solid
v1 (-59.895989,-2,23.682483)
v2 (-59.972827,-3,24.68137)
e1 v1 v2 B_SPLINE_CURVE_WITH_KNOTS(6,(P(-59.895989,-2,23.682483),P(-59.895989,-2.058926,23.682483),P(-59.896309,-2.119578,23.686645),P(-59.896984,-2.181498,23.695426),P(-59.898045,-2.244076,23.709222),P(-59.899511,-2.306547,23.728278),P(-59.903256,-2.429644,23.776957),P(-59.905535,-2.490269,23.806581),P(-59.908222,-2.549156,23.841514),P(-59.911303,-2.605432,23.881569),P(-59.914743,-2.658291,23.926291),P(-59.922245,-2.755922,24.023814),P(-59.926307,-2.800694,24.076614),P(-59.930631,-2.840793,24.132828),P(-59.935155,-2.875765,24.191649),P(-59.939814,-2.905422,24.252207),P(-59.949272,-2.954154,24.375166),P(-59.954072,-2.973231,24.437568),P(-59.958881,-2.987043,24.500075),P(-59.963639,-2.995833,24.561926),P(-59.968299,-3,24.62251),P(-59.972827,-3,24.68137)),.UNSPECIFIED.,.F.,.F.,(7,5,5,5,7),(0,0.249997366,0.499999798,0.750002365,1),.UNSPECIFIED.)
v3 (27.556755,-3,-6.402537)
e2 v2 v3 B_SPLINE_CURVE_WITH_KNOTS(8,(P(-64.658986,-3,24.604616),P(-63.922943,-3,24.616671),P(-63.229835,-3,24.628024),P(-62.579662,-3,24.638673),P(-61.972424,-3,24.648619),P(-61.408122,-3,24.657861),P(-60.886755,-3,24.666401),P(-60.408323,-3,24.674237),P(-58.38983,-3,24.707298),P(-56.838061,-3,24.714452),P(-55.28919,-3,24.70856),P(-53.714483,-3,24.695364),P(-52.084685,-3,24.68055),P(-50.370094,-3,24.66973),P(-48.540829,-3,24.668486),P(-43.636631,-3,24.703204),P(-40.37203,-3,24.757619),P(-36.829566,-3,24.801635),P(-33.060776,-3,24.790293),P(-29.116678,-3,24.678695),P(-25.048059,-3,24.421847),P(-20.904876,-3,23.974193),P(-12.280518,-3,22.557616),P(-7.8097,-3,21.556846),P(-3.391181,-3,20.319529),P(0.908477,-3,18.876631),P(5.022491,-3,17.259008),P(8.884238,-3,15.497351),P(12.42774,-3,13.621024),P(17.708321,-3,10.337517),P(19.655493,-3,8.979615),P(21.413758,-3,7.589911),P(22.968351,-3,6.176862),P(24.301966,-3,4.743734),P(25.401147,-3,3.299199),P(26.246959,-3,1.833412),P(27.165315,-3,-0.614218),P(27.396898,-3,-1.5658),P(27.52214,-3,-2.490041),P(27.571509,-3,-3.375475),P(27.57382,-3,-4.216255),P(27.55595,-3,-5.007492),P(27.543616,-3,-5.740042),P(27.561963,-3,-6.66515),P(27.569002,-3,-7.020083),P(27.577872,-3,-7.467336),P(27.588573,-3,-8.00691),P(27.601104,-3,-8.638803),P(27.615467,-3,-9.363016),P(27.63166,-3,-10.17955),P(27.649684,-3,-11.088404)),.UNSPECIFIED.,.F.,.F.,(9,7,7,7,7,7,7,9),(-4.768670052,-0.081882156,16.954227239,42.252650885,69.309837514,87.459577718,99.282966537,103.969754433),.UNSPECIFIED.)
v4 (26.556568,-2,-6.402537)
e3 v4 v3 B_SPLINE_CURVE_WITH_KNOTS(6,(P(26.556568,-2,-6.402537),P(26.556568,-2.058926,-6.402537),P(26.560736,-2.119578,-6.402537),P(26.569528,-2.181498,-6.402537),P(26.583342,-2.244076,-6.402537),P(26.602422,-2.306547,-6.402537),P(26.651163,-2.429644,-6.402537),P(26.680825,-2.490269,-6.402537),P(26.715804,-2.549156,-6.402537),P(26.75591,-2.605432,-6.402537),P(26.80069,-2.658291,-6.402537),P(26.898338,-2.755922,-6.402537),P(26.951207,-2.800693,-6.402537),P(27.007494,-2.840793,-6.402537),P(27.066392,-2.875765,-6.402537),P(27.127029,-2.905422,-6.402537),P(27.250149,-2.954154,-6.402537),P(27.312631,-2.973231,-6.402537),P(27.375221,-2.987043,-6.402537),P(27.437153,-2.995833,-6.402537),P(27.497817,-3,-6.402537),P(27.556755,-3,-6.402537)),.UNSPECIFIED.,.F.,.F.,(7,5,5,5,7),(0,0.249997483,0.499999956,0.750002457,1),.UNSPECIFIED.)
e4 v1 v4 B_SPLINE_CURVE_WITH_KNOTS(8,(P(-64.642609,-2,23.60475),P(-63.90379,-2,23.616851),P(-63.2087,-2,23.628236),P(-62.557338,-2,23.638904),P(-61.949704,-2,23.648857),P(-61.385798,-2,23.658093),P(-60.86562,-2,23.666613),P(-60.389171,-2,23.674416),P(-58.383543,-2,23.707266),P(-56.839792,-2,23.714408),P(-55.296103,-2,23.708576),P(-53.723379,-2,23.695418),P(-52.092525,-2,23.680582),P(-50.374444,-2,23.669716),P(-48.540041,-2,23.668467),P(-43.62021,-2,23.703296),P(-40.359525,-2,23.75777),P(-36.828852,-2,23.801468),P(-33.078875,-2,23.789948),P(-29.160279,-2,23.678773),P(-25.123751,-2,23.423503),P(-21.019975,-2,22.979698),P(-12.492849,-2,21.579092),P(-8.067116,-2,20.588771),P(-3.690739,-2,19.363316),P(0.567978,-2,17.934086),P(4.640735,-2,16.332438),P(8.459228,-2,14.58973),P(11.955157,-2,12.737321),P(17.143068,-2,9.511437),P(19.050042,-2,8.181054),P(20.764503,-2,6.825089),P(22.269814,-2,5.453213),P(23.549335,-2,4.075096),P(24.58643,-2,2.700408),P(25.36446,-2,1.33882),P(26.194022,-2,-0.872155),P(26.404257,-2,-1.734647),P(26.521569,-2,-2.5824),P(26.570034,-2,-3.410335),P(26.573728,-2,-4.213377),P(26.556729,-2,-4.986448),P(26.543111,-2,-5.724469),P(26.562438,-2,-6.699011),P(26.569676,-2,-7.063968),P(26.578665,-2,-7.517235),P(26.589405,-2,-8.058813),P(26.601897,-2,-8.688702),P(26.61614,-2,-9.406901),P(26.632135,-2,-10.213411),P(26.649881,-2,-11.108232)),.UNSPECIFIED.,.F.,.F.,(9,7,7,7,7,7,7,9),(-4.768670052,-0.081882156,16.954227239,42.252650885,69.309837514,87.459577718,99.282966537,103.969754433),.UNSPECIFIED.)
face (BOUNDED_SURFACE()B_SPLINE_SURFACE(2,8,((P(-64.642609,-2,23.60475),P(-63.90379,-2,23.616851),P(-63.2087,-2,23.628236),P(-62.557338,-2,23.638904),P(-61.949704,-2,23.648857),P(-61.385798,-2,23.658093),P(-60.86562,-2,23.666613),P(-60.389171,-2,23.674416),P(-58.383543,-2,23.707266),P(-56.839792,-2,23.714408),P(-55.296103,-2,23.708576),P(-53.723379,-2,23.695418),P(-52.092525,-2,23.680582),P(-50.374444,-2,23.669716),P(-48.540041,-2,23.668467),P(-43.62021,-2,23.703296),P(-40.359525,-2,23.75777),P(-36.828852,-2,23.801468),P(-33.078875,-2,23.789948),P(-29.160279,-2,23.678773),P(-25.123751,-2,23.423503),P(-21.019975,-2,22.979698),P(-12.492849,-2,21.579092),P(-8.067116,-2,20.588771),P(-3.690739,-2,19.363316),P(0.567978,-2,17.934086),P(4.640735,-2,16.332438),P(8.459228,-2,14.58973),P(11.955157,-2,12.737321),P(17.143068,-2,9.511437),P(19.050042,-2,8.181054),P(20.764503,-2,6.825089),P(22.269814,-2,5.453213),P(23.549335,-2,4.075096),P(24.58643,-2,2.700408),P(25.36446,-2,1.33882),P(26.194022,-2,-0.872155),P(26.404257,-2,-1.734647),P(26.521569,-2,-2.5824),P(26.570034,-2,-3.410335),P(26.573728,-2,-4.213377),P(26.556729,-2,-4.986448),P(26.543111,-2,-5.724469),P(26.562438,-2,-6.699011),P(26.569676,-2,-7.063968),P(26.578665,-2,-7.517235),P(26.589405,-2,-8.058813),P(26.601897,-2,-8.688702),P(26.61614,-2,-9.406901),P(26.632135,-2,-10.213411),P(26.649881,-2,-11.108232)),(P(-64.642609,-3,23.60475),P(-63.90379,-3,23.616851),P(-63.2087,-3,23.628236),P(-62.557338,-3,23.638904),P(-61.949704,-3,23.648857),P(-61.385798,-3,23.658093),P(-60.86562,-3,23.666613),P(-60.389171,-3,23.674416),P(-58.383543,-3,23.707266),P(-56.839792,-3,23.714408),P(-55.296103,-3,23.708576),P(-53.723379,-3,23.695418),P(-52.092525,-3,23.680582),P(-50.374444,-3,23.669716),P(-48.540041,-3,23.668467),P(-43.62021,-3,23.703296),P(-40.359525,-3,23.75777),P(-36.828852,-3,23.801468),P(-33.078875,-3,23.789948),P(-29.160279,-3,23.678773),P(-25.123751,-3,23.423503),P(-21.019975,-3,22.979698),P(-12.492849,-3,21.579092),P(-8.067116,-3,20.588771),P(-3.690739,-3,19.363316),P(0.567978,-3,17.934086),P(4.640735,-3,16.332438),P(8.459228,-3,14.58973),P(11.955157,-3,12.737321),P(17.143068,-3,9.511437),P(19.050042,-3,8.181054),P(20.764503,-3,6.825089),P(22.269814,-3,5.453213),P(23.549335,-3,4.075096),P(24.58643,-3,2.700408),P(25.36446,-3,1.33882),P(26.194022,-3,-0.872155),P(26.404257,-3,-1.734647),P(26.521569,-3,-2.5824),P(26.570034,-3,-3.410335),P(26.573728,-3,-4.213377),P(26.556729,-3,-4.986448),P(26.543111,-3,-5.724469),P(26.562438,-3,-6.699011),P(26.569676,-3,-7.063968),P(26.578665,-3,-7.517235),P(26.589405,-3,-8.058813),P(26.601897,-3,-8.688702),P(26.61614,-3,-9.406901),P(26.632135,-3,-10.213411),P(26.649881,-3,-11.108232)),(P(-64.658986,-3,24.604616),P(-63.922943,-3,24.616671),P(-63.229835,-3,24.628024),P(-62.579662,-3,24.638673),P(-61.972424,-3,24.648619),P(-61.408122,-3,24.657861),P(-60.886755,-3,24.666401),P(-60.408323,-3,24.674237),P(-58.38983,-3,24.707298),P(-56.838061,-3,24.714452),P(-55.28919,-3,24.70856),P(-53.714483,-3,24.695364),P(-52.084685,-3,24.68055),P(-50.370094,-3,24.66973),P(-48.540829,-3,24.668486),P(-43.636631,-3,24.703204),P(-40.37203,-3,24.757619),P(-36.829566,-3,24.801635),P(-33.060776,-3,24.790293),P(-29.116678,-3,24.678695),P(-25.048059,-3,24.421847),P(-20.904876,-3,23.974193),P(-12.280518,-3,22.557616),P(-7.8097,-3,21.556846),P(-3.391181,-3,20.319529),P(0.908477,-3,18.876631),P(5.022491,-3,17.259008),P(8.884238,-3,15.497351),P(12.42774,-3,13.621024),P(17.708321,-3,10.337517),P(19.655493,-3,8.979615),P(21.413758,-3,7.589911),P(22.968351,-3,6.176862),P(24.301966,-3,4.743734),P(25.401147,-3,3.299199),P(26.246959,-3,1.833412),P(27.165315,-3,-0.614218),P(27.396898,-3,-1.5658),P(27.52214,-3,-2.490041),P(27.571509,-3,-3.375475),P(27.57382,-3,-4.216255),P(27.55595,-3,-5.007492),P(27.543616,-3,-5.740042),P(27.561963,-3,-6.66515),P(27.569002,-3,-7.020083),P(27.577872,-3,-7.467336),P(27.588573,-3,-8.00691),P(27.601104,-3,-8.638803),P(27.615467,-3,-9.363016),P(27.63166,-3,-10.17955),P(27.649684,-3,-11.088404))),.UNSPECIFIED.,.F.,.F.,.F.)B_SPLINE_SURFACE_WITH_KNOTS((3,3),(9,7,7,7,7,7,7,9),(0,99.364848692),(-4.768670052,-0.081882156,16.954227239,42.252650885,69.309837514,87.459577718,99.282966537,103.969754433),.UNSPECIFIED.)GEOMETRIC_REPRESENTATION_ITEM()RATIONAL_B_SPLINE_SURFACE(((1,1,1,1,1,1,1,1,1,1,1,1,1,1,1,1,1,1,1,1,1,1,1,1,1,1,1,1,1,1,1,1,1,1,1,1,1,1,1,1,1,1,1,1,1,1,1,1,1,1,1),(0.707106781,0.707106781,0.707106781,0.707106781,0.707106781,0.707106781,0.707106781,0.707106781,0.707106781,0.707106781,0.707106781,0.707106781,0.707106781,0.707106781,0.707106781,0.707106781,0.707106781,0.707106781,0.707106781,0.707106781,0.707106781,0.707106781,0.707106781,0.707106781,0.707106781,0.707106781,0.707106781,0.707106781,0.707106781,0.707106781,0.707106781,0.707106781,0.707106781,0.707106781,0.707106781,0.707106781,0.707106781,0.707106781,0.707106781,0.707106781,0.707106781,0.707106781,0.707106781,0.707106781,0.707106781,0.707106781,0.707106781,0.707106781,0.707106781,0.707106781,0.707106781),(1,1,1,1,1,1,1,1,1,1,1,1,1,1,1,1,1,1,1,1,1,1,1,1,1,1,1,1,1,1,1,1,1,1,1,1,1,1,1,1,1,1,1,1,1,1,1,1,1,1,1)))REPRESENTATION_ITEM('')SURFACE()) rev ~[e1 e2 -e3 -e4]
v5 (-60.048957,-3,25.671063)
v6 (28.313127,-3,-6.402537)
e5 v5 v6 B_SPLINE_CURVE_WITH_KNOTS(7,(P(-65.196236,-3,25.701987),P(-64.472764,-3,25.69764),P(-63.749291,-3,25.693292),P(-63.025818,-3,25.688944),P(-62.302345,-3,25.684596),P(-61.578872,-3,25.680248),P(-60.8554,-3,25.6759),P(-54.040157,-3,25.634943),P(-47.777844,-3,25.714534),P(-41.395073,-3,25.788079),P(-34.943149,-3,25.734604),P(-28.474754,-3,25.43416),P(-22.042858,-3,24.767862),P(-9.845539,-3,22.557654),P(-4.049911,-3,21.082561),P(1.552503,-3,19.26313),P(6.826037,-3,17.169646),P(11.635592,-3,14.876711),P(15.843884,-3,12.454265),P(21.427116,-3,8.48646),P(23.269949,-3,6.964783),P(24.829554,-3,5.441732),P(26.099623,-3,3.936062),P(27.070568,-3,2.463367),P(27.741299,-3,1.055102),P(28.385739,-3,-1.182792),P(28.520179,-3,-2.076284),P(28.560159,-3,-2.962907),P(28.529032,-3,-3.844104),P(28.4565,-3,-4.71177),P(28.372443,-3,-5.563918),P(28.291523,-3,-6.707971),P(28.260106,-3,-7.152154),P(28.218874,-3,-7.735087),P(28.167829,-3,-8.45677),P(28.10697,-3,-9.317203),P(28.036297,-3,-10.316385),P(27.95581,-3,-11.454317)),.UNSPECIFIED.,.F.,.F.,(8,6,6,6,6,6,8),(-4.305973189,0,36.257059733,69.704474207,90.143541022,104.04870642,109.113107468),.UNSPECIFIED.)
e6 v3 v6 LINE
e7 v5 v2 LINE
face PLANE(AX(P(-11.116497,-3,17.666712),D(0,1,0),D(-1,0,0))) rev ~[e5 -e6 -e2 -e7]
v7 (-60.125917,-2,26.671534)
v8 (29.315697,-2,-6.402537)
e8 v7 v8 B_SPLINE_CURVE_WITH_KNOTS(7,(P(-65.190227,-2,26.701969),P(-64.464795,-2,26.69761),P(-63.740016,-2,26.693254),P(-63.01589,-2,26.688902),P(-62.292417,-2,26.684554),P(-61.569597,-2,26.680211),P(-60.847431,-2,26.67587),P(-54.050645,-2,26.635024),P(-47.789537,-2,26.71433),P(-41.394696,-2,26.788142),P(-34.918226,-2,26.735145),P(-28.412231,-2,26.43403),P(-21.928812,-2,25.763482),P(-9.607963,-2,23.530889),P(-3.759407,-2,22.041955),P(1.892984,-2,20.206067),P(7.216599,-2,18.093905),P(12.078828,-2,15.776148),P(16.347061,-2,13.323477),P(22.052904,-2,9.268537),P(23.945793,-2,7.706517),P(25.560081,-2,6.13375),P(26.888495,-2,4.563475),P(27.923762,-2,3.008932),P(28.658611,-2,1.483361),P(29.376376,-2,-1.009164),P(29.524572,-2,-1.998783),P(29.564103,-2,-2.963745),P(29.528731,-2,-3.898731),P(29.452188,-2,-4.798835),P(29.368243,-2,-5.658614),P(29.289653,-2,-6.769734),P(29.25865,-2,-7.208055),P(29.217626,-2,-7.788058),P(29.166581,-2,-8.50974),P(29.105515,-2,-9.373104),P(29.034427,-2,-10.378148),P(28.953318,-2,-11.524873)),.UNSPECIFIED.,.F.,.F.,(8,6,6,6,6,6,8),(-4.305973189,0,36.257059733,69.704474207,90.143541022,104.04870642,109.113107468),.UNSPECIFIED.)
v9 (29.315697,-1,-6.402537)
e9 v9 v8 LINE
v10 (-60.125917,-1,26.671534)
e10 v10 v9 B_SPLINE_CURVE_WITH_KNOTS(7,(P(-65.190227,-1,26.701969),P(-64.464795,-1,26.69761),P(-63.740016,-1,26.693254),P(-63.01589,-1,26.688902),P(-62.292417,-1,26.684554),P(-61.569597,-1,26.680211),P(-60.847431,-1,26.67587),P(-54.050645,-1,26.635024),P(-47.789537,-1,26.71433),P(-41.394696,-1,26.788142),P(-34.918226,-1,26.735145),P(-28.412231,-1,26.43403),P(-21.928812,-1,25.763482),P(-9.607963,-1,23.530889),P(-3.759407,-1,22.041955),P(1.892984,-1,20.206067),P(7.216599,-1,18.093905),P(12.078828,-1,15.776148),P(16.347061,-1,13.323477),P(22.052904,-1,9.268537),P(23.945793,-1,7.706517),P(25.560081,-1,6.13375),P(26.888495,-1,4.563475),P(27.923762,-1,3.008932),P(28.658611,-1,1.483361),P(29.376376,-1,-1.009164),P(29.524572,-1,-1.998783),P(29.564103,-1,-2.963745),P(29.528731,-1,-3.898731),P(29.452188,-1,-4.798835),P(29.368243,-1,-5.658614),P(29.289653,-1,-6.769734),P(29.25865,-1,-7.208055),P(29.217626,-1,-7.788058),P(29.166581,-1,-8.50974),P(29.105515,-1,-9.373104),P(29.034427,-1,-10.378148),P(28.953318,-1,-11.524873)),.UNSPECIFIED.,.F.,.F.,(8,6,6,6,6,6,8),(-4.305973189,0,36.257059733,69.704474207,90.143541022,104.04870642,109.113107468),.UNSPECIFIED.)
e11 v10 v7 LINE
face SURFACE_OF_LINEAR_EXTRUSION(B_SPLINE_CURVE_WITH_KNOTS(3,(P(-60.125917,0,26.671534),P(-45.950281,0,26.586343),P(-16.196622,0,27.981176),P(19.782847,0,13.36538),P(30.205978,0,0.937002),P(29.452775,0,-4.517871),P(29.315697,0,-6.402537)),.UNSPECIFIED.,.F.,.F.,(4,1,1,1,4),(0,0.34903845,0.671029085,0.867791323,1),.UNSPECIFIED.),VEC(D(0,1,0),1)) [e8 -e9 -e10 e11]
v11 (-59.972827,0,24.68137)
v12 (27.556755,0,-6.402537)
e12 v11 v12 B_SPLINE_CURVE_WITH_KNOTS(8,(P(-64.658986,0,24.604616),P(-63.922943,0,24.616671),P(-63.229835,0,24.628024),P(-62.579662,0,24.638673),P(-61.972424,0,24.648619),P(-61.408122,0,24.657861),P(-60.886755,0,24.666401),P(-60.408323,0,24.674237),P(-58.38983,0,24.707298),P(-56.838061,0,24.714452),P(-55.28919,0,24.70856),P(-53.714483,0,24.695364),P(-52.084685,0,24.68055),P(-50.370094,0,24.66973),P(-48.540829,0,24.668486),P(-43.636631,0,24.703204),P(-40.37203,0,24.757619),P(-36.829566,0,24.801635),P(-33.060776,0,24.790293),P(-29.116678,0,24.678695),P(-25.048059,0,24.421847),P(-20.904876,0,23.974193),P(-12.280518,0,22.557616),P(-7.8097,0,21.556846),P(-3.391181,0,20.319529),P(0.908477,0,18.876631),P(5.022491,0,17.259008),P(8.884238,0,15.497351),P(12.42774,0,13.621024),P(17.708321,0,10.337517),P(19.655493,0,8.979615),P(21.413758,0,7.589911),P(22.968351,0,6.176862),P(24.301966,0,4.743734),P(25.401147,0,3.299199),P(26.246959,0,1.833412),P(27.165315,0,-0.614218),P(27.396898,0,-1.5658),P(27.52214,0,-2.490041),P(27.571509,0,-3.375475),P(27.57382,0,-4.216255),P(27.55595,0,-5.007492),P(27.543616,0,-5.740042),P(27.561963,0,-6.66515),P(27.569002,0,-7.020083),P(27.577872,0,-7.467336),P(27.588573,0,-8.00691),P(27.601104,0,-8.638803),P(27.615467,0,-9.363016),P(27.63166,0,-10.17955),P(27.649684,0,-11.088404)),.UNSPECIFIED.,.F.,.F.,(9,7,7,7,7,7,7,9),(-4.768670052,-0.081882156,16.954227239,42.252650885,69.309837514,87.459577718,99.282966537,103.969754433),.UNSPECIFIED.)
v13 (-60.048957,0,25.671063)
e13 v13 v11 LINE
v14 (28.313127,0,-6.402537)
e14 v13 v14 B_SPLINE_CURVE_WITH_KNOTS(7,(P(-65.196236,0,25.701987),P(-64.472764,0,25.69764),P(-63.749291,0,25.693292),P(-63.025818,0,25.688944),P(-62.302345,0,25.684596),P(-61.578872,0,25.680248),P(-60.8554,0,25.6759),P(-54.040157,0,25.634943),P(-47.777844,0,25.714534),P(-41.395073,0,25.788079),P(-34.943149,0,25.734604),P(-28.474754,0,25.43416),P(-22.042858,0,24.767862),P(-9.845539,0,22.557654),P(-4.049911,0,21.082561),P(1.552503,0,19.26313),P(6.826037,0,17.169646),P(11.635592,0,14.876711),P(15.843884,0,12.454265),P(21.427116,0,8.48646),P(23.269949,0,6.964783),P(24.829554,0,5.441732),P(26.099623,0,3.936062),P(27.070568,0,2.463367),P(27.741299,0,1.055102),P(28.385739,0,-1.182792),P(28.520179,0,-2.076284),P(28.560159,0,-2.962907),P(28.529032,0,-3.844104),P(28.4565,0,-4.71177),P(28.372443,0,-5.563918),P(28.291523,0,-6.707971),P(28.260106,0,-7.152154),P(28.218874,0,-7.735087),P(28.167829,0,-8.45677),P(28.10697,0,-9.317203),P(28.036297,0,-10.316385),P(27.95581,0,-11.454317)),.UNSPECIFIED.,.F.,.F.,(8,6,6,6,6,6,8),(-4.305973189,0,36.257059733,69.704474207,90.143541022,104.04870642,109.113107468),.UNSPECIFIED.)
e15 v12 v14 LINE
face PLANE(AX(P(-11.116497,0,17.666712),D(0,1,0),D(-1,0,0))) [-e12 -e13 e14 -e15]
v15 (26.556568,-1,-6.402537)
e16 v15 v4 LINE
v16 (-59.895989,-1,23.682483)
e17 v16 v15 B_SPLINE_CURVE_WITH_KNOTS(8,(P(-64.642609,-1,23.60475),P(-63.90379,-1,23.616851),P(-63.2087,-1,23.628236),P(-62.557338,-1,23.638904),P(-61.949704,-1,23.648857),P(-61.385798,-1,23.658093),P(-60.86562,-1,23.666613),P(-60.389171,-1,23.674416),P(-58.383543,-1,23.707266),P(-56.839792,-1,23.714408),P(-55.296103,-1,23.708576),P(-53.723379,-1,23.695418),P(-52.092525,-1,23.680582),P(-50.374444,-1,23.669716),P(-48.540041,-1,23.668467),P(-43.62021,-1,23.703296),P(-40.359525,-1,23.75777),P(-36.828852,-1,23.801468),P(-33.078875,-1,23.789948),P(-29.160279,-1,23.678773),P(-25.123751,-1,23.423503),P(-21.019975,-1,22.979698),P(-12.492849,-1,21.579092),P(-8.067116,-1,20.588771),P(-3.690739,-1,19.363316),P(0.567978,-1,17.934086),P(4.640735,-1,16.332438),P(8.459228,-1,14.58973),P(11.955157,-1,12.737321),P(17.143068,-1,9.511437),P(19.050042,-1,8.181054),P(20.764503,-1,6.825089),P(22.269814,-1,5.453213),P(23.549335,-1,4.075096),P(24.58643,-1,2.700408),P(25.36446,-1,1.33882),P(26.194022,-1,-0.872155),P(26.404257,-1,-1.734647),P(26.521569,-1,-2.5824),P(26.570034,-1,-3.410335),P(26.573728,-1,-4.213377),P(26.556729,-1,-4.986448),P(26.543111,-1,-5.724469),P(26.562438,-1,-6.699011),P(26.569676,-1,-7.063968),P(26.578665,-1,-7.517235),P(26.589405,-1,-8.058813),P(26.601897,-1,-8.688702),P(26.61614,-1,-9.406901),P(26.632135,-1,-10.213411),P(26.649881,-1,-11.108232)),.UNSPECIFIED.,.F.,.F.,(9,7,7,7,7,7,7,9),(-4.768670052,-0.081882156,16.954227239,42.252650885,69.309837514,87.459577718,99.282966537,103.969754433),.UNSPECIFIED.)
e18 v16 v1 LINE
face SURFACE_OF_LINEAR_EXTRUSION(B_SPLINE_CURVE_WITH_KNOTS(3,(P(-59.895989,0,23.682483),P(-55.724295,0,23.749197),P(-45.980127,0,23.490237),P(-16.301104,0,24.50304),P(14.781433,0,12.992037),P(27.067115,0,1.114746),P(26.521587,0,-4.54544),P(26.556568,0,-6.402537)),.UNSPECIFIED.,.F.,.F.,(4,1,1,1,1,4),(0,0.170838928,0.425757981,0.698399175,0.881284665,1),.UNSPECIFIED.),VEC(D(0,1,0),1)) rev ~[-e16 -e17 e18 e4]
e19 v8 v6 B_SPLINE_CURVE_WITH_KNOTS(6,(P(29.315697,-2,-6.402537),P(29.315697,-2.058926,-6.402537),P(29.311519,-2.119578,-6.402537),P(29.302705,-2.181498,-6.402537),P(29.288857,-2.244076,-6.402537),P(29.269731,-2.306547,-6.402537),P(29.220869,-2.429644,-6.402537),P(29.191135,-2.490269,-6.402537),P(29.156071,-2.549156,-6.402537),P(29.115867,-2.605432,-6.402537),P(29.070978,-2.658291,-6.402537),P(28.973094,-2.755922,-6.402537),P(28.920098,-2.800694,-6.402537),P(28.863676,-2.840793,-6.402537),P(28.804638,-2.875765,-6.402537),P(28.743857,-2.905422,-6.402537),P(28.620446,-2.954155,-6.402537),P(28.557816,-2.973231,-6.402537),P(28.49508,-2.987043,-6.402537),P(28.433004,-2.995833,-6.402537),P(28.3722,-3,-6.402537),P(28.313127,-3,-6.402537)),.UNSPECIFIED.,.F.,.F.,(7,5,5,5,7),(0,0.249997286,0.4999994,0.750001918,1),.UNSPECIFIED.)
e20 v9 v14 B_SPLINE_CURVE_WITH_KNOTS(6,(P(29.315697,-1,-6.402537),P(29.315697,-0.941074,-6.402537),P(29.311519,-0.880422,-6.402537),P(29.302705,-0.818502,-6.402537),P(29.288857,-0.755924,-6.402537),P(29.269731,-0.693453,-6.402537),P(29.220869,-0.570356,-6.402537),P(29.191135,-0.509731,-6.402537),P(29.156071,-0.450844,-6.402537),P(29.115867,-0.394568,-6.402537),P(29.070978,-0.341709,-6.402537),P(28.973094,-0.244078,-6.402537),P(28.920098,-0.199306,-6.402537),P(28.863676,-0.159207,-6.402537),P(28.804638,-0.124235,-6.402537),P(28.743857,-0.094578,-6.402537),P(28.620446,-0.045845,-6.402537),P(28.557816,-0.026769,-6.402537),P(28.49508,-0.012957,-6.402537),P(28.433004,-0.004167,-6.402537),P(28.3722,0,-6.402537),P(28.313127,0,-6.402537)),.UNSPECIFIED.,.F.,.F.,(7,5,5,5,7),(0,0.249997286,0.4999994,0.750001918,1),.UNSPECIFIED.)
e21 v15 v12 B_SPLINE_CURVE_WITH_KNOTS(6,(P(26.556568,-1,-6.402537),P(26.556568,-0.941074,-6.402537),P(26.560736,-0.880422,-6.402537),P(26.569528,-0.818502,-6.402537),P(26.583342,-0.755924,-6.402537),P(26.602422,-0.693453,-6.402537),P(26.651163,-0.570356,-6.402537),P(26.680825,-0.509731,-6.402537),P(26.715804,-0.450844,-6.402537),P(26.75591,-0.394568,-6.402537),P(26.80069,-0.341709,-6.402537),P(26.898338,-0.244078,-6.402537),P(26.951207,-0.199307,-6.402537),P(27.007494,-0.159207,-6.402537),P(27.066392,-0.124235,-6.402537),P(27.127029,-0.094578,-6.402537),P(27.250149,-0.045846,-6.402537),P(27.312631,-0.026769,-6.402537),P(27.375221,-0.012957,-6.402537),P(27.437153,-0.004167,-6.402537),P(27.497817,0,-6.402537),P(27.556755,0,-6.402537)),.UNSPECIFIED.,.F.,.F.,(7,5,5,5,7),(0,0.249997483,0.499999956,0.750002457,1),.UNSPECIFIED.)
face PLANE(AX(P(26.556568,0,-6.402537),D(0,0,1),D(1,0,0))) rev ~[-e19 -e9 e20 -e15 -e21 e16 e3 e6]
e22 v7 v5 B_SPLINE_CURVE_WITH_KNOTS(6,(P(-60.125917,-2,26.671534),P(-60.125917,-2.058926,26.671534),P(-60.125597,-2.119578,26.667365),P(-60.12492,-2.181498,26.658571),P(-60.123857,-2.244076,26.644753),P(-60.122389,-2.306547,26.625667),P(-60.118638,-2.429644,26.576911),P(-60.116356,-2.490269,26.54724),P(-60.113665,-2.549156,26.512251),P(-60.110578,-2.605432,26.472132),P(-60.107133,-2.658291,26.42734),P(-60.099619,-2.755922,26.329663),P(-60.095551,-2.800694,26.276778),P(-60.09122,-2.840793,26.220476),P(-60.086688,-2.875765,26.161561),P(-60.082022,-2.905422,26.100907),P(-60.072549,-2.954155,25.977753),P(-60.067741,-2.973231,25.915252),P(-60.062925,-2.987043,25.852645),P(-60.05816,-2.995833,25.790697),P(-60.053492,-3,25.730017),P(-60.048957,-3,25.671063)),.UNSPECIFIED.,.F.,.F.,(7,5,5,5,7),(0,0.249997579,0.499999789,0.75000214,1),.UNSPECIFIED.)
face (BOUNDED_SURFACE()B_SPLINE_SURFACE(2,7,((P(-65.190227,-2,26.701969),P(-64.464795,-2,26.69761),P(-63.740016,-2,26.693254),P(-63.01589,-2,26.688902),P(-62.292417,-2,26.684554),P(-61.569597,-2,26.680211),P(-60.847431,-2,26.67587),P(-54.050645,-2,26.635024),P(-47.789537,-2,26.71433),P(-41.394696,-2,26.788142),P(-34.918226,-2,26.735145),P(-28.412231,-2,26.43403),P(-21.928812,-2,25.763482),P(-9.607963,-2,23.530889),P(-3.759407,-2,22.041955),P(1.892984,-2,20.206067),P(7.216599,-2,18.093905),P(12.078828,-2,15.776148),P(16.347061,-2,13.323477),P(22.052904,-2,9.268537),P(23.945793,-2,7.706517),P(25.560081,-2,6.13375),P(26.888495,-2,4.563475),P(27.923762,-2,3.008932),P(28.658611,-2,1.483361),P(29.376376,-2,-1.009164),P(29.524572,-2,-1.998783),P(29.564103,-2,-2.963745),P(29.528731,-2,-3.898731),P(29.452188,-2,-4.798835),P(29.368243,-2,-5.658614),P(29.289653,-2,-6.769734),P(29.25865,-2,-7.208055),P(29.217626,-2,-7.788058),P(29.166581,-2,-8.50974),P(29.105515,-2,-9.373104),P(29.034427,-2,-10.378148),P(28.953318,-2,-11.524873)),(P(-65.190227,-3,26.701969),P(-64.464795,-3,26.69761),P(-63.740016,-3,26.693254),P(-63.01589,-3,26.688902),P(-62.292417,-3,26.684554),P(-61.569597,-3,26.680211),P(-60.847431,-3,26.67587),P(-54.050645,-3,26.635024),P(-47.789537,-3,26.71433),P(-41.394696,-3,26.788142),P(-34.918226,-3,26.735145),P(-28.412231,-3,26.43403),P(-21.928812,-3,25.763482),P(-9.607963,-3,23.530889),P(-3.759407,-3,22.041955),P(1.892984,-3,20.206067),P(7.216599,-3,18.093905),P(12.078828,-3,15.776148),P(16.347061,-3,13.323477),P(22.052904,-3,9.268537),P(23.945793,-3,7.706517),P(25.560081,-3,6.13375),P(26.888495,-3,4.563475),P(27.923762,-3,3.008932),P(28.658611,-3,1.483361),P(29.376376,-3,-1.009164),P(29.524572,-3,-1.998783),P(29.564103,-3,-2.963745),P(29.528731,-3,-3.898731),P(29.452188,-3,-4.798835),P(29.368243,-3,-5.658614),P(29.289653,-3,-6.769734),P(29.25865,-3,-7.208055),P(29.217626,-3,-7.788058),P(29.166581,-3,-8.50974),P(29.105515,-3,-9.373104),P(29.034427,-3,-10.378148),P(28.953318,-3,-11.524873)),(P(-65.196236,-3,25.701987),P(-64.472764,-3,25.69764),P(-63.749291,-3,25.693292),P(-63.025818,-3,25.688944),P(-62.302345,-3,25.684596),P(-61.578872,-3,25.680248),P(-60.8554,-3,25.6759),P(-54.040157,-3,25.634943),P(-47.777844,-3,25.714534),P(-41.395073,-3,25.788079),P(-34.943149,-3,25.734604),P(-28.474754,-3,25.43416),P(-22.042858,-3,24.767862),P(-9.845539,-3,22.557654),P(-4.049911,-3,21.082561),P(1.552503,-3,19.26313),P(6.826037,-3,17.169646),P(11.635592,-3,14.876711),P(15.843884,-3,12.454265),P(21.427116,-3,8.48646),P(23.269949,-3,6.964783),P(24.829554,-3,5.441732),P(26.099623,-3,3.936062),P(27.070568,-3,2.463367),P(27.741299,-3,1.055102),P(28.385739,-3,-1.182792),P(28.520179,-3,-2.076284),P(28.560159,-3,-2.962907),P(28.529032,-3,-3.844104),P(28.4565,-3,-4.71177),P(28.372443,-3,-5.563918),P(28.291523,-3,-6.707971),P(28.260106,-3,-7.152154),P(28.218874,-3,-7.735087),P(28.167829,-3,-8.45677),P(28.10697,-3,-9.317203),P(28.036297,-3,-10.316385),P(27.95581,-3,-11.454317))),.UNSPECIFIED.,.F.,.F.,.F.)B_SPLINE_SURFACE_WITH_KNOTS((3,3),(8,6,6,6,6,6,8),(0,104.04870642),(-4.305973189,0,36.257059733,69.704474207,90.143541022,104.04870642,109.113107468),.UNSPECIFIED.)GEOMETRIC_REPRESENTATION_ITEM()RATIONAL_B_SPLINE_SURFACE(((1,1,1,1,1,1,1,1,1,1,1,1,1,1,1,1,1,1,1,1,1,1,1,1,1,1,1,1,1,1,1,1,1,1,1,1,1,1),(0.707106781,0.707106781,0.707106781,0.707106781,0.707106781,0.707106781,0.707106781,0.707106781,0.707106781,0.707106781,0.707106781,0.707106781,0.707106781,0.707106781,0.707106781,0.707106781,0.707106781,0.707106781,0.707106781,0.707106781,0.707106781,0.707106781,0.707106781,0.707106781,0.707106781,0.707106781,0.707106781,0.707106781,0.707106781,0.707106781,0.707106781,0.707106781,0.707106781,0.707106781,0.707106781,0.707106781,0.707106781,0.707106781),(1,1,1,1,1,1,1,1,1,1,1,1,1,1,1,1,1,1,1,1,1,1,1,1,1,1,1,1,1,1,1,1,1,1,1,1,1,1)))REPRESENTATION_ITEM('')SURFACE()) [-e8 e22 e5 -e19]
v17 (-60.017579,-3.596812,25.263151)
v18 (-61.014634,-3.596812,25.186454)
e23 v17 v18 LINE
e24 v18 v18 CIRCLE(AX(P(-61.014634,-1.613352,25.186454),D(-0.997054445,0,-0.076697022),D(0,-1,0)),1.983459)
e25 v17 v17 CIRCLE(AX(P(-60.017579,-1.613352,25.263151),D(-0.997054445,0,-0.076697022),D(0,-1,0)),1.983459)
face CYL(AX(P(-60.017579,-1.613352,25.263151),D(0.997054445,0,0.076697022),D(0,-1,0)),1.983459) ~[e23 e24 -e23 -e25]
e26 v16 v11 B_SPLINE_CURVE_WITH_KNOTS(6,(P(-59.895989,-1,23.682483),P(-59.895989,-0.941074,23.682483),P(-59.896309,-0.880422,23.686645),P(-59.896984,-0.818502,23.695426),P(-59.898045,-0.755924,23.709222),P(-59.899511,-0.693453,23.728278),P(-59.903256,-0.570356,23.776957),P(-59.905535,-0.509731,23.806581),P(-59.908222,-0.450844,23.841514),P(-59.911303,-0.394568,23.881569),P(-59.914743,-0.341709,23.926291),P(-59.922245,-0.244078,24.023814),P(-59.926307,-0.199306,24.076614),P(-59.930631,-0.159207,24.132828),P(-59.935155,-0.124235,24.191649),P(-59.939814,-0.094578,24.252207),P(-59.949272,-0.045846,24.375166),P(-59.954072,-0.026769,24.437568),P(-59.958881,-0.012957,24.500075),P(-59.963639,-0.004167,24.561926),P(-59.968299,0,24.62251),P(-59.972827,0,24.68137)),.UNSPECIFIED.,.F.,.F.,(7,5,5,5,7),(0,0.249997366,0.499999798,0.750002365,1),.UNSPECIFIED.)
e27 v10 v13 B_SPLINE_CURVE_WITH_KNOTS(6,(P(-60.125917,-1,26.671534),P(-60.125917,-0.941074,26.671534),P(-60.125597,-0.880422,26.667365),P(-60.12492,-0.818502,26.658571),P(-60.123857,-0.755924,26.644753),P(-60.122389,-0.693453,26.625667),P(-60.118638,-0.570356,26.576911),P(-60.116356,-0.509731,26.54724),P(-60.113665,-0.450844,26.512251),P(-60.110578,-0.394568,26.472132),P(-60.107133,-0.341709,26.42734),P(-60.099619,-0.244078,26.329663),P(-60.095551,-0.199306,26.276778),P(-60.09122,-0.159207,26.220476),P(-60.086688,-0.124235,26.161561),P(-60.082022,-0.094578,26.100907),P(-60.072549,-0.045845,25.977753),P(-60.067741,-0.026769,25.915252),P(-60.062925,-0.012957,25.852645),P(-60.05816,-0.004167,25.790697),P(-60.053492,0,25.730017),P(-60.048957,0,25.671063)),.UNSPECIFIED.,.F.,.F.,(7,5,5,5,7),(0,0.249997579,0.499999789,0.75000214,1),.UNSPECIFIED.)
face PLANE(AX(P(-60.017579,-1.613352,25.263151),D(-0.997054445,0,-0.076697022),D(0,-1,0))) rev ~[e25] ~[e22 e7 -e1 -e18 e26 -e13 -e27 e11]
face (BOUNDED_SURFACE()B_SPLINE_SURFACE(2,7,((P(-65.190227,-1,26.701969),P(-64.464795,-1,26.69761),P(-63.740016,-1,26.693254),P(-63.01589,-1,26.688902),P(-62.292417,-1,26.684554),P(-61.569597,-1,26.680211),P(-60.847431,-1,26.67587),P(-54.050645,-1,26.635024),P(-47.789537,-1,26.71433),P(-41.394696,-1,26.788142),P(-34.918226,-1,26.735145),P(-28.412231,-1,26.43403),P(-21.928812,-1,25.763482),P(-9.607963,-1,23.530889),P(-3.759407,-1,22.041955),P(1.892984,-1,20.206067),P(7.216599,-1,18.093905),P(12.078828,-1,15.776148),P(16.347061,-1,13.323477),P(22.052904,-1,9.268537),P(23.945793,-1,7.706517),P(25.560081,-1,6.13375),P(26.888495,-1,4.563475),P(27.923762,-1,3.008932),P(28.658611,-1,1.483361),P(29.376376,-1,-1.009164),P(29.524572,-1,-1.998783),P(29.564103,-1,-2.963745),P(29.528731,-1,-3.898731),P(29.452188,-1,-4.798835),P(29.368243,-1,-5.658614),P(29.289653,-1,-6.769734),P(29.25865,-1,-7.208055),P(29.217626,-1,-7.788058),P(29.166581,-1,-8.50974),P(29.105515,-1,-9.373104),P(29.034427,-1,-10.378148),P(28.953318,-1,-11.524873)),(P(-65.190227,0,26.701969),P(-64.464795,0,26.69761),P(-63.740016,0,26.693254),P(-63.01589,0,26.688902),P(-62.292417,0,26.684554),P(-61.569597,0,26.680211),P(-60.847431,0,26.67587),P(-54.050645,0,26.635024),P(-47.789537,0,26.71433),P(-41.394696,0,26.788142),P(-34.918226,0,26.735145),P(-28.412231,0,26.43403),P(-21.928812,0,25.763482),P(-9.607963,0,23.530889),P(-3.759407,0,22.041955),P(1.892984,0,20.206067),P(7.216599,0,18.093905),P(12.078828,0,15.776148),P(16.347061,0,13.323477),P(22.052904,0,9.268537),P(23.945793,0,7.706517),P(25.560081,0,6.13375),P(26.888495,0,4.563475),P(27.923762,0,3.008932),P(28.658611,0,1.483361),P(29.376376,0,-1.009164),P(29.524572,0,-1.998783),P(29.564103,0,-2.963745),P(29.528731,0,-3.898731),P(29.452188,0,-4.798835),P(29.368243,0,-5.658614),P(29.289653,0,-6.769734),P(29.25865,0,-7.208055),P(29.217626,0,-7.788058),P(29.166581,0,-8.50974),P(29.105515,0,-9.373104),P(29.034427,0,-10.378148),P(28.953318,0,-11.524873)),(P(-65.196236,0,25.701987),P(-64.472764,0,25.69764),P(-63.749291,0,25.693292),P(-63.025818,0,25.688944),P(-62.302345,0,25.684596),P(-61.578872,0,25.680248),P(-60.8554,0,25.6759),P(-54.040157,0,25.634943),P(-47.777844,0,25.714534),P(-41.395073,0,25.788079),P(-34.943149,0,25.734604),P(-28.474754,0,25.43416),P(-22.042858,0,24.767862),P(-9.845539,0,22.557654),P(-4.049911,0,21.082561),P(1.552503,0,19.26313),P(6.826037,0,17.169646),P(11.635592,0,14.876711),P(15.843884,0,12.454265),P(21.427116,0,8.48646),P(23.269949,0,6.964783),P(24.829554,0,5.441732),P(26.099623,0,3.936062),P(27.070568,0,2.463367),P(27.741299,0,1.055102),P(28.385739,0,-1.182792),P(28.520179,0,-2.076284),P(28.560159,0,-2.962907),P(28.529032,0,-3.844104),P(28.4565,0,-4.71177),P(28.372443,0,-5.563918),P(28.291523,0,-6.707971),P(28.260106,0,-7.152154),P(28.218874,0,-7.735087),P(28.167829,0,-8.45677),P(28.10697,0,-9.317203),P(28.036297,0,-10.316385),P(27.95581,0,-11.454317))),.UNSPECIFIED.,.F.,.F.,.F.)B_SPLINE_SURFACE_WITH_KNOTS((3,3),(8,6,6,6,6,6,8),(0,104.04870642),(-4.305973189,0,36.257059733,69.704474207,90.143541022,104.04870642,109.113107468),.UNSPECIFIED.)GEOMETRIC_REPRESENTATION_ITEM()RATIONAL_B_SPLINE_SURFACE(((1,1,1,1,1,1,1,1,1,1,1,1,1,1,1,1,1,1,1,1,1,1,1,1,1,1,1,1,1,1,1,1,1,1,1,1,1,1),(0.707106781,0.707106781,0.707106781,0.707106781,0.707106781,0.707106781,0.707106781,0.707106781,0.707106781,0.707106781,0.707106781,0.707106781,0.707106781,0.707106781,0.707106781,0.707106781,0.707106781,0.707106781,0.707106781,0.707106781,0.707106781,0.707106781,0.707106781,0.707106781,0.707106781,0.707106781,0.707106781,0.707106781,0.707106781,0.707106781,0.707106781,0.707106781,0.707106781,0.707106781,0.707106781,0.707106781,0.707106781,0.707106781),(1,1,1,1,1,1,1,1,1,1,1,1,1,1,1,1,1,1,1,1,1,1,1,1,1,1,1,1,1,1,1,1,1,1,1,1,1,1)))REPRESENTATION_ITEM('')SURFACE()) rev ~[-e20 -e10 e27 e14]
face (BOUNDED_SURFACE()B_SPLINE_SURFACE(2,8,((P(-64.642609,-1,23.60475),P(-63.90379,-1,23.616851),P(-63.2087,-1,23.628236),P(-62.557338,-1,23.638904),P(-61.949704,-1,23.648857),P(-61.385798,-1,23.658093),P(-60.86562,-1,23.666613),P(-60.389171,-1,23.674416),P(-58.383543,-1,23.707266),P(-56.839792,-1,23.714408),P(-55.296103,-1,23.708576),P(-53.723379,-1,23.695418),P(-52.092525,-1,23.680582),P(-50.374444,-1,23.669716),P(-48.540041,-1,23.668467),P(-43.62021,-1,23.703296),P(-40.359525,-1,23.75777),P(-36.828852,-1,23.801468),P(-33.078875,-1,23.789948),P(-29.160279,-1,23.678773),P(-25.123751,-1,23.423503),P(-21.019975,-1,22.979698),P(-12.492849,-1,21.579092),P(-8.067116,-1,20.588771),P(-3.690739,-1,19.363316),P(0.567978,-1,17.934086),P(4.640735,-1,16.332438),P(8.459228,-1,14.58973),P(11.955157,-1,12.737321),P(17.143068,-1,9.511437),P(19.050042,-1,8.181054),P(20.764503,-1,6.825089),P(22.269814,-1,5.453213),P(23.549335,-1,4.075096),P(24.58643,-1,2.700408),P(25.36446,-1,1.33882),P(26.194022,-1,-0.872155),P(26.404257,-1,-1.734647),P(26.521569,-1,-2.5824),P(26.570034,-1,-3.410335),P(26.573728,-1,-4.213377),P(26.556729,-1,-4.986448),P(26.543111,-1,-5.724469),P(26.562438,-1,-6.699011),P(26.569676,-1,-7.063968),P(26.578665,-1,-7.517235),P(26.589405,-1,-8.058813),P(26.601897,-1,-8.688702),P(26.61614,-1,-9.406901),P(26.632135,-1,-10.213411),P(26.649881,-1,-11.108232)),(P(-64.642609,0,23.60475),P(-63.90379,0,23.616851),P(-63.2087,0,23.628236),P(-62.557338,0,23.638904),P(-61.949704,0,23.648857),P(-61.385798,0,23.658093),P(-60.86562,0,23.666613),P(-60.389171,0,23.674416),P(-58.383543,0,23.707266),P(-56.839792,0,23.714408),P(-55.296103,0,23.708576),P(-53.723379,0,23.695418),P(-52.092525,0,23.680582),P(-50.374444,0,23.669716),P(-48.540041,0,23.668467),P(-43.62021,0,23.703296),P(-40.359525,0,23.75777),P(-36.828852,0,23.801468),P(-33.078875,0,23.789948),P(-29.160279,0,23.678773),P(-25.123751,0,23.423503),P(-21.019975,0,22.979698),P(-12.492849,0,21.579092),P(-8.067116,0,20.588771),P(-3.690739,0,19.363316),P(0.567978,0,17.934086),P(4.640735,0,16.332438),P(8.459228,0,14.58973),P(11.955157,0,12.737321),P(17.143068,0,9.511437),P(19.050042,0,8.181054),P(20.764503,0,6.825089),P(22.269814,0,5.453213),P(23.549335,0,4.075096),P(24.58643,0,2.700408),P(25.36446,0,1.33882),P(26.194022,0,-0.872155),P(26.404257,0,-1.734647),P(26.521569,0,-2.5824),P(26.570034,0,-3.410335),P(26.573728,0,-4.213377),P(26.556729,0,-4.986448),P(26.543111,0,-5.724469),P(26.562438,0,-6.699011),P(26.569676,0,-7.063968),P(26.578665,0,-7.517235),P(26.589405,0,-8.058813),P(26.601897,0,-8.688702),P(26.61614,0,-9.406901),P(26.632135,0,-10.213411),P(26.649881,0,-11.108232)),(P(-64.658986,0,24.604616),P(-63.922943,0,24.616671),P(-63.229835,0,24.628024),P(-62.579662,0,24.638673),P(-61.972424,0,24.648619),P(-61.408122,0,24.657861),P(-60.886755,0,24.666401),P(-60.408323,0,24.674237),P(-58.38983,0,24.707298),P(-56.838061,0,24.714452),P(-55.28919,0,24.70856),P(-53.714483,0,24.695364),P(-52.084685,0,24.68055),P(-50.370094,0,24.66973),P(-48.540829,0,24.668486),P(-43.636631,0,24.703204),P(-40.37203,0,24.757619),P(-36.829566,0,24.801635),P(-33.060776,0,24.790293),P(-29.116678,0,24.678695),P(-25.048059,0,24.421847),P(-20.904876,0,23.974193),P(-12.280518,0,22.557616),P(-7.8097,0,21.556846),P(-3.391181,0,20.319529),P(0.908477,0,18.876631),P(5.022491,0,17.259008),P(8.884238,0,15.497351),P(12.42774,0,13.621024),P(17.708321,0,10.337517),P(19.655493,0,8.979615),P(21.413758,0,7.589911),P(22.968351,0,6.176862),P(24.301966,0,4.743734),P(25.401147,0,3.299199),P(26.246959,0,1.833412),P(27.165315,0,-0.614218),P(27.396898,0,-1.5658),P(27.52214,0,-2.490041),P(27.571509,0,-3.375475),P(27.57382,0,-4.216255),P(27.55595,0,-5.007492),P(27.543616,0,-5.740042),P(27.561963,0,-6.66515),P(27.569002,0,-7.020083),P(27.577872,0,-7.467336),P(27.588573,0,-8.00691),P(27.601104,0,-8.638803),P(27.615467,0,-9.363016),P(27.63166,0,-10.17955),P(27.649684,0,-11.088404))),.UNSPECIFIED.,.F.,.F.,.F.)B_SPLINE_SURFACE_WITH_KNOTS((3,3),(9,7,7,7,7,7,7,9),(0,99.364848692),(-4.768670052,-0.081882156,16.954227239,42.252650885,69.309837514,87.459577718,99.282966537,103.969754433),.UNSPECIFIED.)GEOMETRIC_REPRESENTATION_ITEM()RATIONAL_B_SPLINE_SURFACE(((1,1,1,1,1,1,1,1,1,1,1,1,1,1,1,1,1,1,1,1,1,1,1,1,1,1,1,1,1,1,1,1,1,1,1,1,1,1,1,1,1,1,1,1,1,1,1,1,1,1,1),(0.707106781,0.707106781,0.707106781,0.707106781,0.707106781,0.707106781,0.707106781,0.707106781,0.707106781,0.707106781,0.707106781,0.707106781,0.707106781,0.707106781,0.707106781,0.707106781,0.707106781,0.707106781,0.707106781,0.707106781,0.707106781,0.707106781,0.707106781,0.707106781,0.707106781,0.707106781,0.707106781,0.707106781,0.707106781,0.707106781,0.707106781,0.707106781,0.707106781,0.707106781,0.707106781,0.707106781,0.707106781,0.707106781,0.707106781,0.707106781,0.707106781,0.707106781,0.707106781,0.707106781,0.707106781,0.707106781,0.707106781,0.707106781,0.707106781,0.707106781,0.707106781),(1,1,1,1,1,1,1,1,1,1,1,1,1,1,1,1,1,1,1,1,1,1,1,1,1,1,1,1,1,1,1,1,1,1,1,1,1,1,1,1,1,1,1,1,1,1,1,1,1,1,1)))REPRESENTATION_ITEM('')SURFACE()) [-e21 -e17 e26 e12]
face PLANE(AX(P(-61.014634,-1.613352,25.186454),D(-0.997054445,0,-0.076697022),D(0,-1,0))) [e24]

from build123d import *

# Parameters (mm, degrees)
F1_DEPTH = 3
F2_R     = 1
F3_R     = 1.9834594101
F4_DEPTH = 1


with BuildPart() as f1:
    # F0 (on Front) → F1 (new body)
    with BuildSketch(Plane.XZ):
        with BuildLine():
            add(Edge.make_bspline(
                [(-60.1259171963, 26.6715344042), (-45.950281109, 26.5863429632), (-16.1966218447, 27.9811763069), (19.7828472581, 13.3653801763), (30.2059783266, 0.9370018135), (29.4527750191, -4.5178706528), (29.3156970292, -6.4025372267)],
                knots=[0, 0, 0, 0, 0.3490384499, 0.6710290853, 0.8677913228, 1, 1, 1, 1], degree=3))
            Line((-60.1259171963, 26.6715344042), (-59.8959885538, 23.6824825406))
            add(Edge.make_bspline(
                [(-59.8959885538, 23.6824825406), (-55.7242948882, 23.7491967997), (-45.9801272737, 23.4902373676), (-16.3011036479, 24.5030395159), (14.7814330999, 12.9920368732), (27.067114625, 1.1147458899), (26.5215866088, -4.5454404746), (26.5565682203, -6.4025372267)],
                knots=[0, 0, 0, 0, 0.1708389276, 0.4257579814, 0.6983991748, 0.8812846646, 1, 1, 1, 1], degree=3))
            Line((26.5565682203, -6.4025372267), (29.3156970292, -6.4025372267))
        make_face()
    extrude(amount=F1_DEPTH)

    # F2
    f2_edges = [f1.edges().sort_by_distance(p)[0] for p in [
        (-8.468397, -3, 23.066336),
        (-8.468397, 0, 23.066336),
        (-10.479506, 0, 21.01023),
        (-10.479506, -3, 21.01023),
    ]]
    fillet(f2_edges, radius=F2_R)

    # F3 (on face) → F4 (join)
    with BuildSketch(Plane(origin=(-57.7326287688, 0, -4.4410018853), x_dir=(0, -1, 0), z_dir=(-0.9970544453, 0, -0.0766970215))):
        with Locations((1.6133522149, 29.791906476)):
            Circle(F3_R)
    extrude(amount=F4_DEPTH)


solid = f1.part
